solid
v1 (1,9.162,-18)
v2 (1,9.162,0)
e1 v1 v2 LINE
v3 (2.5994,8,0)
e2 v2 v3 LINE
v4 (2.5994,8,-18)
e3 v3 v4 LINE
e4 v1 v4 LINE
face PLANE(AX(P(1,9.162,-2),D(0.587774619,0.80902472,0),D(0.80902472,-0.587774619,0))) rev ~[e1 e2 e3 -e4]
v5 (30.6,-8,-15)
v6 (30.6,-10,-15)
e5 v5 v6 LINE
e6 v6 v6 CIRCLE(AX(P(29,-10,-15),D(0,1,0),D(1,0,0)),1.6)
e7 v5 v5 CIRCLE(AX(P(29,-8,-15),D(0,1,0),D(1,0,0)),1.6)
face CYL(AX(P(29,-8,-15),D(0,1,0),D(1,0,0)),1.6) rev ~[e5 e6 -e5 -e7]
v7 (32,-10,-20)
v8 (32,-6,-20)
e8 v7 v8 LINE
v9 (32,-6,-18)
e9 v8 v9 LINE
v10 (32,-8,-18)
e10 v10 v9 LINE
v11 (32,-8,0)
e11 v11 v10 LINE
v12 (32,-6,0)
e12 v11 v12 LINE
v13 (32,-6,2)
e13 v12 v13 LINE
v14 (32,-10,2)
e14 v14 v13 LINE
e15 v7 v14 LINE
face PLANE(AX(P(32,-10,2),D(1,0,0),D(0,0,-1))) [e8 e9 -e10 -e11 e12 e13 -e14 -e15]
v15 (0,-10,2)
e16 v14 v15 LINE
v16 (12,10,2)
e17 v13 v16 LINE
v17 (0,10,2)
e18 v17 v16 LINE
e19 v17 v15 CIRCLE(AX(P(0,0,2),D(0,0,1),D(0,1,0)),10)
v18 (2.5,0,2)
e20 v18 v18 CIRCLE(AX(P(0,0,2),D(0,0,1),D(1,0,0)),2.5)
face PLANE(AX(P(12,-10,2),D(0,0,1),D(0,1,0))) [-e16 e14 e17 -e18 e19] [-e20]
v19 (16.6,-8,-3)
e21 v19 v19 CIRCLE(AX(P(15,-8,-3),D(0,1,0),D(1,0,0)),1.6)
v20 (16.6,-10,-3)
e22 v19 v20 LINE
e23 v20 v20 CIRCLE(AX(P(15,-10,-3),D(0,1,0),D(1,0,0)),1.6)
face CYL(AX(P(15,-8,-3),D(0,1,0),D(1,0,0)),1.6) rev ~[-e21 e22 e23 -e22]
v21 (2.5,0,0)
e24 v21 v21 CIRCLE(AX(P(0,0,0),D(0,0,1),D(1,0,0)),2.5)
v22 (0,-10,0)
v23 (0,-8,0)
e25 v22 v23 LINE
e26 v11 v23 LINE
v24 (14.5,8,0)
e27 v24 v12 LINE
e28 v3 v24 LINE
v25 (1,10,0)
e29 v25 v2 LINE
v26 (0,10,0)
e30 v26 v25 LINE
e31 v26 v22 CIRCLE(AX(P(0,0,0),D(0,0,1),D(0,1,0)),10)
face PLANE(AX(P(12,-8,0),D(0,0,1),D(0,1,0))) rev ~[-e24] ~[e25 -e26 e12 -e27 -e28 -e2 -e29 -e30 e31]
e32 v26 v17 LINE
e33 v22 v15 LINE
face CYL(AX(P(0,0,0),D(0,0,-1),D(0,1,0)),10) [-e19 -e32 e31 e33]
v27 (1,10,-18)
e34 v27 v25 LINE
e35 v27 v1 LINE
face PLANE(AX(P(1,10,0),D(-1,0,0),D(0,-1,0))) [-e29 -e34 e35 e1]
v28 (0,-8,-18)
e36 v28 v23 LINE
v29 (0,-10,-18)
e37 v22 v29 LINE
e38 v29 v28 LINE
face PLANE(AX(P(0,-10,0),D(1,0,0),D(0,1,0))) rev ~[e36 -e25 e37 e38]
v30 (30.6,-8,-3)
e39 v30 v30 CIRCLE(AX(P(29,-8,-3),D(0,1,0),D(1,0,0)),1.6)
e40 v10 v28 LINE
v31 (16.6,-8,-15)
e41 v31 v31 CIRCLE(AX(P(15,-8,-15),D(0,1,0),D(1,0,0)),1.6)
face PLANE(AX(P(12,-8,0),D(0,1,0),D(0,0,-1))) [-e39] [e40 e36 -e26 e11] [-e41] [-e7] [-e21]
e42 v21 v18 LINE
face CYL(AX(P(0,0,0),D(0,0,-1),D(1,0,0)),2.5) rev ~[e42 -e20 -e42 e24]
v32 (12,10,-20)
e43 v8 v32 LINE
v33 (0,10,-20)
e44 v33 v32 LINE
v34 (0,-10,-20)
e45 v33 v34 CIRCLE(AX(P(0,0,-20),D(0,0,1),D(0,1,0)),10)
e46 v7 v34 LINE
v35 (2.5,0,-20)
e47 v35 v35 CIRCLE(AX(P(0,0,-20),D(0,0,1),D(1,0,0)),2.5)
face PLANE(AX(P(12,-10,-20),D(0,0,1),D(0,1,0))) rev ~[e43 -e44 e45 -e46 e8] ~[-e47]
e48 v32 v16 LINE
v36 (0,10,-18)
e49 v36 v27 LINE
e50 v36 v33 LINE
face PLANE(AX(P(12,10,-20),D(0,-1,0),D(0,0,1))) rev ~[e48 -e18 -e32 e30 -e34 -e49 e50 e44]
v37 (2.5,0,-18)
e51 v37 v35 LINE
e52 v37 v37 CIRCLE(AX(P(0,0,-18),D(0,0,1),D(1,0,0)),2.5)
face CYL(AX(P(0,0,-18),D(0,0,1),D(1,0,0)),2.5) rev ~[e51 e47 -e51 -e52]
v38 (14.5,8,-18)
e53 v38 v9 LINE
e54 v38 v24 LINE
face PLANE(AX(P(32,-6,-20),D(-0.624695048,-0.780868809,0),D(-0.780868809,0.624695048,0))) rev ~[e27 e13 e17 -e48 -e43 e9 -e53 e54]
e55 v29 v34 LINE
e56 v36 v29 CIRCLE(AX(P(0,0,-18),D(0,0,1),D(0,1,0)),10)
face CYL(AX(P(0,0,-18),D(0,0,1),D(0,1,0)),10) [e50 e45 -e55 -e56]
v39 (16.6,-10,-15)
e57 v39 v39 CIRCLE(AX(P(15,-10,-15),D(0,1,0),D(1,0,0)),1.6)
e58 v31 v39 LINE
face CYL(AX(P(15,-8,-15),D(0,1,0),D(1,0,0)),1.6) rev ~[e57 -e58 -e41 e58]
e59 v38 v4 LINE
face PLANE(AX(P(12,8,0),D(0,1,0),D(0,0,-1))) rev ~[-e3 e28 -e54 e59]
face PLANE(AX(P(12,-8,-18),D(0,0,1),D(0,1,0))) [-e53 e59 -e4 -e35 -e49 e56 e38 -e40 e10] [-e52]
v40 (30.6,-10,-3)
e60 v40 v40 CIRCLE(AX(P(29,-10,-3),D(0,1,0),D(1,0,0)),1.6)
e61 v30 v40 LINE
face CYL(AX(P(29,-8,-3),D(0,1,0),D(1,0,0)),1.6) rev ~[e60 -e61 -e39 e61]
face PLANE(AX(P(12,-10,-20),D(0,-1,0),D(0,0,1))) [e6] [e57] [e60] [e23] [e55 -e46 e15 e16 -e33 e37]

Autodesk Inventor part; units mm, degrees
ref_plane "YZ Plane" through (0, 0, 0) normal (1, 0, 0) x (0, 1, 0)
ref_plane "XZ Plane" through (0, 0, 0) normal (0, 1, 0) x (-1, 0, 0)
sketch "Sketch1" plane through (0, 0, 0) normal (0, 0, 1) x (1, 0, 0)
  circle A0 centre (0, 0) radius 2.5
  arc A1 (0, 10) -> (0, -10) centre (0, 0) ccw
  line L0 (0, 10) -> (12, 10)
  line L1 (0, -10) -> (12, -10)
  line L2 (12, -10) -> (12, 10)
  dimension "d0" = 5
  dimension "d1" = 20
  dimension "d2" = 12
extrude "Extrusion1" add sketch "Sketch1" along normal blind 2
sketch "Sketch5" plane through (0, 0, 0) normal (0, 0, -1) x (-1, 0, 0)
  circle A0 centre (0, 0) radius 2.5 projected
  line L0 (-12, -10) -> (0, -10)
  line L1 (0, -10) -> (0, -8)
  line L2 (0, -8) -> (-12, -8)
  line L3 (-12, -8) -> (-12, -10)
  line L4 (-12, 10) -> (-1, 10)
  line L5 (-1, 10) -> (-1, 8)
  line L6 (-1, 8) -> (-12, 8)
  line L7 (-12, 8) -> (-12, 10)
  dimension "d21" = 2
  dimension "d22" = 2
  dimension "d24" = 1
extrude "Extrusion5" add sketch "Sketch5" along normal blind 2 contours L3 L2 L1 L0 | L4 L5 L6 L7
sketch "Sketch6" plane through (0, 0, -2) normal (0, 0, -1) x (-1, 0, 0)
  line L0 (-12, 8) -> (-1, 8) projected
  line L1 (-1, 8) -> (-1, 10) projected
  line L2 (-1, 9.162) -> (-2.5994, 8)
  line L3 (-2.5994, 8) -> (6.8052, -4.9443) construction
  line L4 (6.8052, -4.9443) -> (8.4046, -3.7823) construction
  line L5 (8.4046, -3.7823) -> (-1, 9.162) construction
  line L6 (-2.5994, 8) -> (-1, 8)
  line L7 (-1, 9.162) -> (-1, 8)
  point P0 (0, 0)
  dimension "d27" = 16
  dimension "d28" = 8
  dimension "d29" = 36
extrude "Extrusion6" cut sketch "Sketch6" against normal blind 2
ref_plane "Work Plane1" through (0, 0, -9) normal (0, 0, -1) x (-1, 0, 0)
mirror "Mirror1" about plane through (0, 0, -9) normal (0, 0, -1)
sketch "Sketch7" plane through (0, -10, -16) normal (0, 0, 1) x (1, 0, 0)
  line L0 (12, 0) -> (0, 0) projected
  line L1 (12, 2) -> (12, 0) projected
  line L2 (0, 2) -> (12, 2) projected
  line L3 (0, 0) -> (0, 2) projected
  line L4 (2.5994, 18) -> (1, 19.162) projected
  line L5 (12, 18) -> (2.5994, 18) projected
  line L6 (12, 20) -> (12, 18) projected
  line L7 (1, 20) -> (12, 20) projected
  line L8 (1, 19.162) -> (1, 20) projected
  point P0 (0, 10)
extrude "Extrusion7" add sketch "Sketch7" along normal blind 14
sketch "Sketch8" plane through (12, -10, 2) normal (1, 0, 0) x (0, 0, -1)
  line L0 (22, 20) -> (0, 20) projected
  line L1 (0, 0) -> (0, 20) projected
  line L2 (22, 0) -> (0, 0) projected
  line L3 (22, 0) -> (22, 20) projected
  line L4 (2, 18) -> (20, 18) projected
  line L5 (20, 2) -> (20, 18) projected
  line L6 (2, 2) -> (20, 2) projected
  line L7 (2, 2) -> (2, 18) projected
  point P0 (2, 10)
extrude "Extrusion8" add sketch "Sketch8" along normal blind 20
sketch "Sketch9" plane through (0, 0, -20) normal (0, 0, -1) x (-1, 0, 0)
  line L0 (-32, 10) -> (0, 10) projected
  line L1 (-32, -10) -> (-32, 10) projected
  line L2 (-32, -6) -> (-12, 10)
  dimension "d37" = 20
  dimension "d38" = 4
extrude "Extrusion9" cut sketch "Sketch9" against normal blind 22
sketch "Sketch10" plane through (0, -8, 0) normal (0, 1, 0) x (1, 0, 0)
  line L0 (32, 0) -> (0, 0) projected
  line L1 (32, 18) -> (32, 0) projected
  line L2 (0, 18) -> (32, 18) projected
  line L3 (15, 15) -> (29, 15) construction
  line L4 (29, 15) -> (29, 3) construction
  line L5 (29, 3) -> (15, 3) construction
  line L6 (15, 3) -> (15, 15) construction
  circle A0 centre (15, 3) radius 1.6
  circle A1 centre (29, 3) radius 1.6
  circle A2 centre (29, 15) radius 1.6
  circle A3 centre (15, 15) radius 1.6
  dimension "d41" = 3.2
  dimension "d42" = 3
  dimension "d43" = 3
  dimension "d44" = 3
  dimension "d45" = 14
extrude "Extrusion10" cut sketch "Sketch10" against normal through all
properties part number "x_axis_cable_mount_a" material "ABS Plastic"
